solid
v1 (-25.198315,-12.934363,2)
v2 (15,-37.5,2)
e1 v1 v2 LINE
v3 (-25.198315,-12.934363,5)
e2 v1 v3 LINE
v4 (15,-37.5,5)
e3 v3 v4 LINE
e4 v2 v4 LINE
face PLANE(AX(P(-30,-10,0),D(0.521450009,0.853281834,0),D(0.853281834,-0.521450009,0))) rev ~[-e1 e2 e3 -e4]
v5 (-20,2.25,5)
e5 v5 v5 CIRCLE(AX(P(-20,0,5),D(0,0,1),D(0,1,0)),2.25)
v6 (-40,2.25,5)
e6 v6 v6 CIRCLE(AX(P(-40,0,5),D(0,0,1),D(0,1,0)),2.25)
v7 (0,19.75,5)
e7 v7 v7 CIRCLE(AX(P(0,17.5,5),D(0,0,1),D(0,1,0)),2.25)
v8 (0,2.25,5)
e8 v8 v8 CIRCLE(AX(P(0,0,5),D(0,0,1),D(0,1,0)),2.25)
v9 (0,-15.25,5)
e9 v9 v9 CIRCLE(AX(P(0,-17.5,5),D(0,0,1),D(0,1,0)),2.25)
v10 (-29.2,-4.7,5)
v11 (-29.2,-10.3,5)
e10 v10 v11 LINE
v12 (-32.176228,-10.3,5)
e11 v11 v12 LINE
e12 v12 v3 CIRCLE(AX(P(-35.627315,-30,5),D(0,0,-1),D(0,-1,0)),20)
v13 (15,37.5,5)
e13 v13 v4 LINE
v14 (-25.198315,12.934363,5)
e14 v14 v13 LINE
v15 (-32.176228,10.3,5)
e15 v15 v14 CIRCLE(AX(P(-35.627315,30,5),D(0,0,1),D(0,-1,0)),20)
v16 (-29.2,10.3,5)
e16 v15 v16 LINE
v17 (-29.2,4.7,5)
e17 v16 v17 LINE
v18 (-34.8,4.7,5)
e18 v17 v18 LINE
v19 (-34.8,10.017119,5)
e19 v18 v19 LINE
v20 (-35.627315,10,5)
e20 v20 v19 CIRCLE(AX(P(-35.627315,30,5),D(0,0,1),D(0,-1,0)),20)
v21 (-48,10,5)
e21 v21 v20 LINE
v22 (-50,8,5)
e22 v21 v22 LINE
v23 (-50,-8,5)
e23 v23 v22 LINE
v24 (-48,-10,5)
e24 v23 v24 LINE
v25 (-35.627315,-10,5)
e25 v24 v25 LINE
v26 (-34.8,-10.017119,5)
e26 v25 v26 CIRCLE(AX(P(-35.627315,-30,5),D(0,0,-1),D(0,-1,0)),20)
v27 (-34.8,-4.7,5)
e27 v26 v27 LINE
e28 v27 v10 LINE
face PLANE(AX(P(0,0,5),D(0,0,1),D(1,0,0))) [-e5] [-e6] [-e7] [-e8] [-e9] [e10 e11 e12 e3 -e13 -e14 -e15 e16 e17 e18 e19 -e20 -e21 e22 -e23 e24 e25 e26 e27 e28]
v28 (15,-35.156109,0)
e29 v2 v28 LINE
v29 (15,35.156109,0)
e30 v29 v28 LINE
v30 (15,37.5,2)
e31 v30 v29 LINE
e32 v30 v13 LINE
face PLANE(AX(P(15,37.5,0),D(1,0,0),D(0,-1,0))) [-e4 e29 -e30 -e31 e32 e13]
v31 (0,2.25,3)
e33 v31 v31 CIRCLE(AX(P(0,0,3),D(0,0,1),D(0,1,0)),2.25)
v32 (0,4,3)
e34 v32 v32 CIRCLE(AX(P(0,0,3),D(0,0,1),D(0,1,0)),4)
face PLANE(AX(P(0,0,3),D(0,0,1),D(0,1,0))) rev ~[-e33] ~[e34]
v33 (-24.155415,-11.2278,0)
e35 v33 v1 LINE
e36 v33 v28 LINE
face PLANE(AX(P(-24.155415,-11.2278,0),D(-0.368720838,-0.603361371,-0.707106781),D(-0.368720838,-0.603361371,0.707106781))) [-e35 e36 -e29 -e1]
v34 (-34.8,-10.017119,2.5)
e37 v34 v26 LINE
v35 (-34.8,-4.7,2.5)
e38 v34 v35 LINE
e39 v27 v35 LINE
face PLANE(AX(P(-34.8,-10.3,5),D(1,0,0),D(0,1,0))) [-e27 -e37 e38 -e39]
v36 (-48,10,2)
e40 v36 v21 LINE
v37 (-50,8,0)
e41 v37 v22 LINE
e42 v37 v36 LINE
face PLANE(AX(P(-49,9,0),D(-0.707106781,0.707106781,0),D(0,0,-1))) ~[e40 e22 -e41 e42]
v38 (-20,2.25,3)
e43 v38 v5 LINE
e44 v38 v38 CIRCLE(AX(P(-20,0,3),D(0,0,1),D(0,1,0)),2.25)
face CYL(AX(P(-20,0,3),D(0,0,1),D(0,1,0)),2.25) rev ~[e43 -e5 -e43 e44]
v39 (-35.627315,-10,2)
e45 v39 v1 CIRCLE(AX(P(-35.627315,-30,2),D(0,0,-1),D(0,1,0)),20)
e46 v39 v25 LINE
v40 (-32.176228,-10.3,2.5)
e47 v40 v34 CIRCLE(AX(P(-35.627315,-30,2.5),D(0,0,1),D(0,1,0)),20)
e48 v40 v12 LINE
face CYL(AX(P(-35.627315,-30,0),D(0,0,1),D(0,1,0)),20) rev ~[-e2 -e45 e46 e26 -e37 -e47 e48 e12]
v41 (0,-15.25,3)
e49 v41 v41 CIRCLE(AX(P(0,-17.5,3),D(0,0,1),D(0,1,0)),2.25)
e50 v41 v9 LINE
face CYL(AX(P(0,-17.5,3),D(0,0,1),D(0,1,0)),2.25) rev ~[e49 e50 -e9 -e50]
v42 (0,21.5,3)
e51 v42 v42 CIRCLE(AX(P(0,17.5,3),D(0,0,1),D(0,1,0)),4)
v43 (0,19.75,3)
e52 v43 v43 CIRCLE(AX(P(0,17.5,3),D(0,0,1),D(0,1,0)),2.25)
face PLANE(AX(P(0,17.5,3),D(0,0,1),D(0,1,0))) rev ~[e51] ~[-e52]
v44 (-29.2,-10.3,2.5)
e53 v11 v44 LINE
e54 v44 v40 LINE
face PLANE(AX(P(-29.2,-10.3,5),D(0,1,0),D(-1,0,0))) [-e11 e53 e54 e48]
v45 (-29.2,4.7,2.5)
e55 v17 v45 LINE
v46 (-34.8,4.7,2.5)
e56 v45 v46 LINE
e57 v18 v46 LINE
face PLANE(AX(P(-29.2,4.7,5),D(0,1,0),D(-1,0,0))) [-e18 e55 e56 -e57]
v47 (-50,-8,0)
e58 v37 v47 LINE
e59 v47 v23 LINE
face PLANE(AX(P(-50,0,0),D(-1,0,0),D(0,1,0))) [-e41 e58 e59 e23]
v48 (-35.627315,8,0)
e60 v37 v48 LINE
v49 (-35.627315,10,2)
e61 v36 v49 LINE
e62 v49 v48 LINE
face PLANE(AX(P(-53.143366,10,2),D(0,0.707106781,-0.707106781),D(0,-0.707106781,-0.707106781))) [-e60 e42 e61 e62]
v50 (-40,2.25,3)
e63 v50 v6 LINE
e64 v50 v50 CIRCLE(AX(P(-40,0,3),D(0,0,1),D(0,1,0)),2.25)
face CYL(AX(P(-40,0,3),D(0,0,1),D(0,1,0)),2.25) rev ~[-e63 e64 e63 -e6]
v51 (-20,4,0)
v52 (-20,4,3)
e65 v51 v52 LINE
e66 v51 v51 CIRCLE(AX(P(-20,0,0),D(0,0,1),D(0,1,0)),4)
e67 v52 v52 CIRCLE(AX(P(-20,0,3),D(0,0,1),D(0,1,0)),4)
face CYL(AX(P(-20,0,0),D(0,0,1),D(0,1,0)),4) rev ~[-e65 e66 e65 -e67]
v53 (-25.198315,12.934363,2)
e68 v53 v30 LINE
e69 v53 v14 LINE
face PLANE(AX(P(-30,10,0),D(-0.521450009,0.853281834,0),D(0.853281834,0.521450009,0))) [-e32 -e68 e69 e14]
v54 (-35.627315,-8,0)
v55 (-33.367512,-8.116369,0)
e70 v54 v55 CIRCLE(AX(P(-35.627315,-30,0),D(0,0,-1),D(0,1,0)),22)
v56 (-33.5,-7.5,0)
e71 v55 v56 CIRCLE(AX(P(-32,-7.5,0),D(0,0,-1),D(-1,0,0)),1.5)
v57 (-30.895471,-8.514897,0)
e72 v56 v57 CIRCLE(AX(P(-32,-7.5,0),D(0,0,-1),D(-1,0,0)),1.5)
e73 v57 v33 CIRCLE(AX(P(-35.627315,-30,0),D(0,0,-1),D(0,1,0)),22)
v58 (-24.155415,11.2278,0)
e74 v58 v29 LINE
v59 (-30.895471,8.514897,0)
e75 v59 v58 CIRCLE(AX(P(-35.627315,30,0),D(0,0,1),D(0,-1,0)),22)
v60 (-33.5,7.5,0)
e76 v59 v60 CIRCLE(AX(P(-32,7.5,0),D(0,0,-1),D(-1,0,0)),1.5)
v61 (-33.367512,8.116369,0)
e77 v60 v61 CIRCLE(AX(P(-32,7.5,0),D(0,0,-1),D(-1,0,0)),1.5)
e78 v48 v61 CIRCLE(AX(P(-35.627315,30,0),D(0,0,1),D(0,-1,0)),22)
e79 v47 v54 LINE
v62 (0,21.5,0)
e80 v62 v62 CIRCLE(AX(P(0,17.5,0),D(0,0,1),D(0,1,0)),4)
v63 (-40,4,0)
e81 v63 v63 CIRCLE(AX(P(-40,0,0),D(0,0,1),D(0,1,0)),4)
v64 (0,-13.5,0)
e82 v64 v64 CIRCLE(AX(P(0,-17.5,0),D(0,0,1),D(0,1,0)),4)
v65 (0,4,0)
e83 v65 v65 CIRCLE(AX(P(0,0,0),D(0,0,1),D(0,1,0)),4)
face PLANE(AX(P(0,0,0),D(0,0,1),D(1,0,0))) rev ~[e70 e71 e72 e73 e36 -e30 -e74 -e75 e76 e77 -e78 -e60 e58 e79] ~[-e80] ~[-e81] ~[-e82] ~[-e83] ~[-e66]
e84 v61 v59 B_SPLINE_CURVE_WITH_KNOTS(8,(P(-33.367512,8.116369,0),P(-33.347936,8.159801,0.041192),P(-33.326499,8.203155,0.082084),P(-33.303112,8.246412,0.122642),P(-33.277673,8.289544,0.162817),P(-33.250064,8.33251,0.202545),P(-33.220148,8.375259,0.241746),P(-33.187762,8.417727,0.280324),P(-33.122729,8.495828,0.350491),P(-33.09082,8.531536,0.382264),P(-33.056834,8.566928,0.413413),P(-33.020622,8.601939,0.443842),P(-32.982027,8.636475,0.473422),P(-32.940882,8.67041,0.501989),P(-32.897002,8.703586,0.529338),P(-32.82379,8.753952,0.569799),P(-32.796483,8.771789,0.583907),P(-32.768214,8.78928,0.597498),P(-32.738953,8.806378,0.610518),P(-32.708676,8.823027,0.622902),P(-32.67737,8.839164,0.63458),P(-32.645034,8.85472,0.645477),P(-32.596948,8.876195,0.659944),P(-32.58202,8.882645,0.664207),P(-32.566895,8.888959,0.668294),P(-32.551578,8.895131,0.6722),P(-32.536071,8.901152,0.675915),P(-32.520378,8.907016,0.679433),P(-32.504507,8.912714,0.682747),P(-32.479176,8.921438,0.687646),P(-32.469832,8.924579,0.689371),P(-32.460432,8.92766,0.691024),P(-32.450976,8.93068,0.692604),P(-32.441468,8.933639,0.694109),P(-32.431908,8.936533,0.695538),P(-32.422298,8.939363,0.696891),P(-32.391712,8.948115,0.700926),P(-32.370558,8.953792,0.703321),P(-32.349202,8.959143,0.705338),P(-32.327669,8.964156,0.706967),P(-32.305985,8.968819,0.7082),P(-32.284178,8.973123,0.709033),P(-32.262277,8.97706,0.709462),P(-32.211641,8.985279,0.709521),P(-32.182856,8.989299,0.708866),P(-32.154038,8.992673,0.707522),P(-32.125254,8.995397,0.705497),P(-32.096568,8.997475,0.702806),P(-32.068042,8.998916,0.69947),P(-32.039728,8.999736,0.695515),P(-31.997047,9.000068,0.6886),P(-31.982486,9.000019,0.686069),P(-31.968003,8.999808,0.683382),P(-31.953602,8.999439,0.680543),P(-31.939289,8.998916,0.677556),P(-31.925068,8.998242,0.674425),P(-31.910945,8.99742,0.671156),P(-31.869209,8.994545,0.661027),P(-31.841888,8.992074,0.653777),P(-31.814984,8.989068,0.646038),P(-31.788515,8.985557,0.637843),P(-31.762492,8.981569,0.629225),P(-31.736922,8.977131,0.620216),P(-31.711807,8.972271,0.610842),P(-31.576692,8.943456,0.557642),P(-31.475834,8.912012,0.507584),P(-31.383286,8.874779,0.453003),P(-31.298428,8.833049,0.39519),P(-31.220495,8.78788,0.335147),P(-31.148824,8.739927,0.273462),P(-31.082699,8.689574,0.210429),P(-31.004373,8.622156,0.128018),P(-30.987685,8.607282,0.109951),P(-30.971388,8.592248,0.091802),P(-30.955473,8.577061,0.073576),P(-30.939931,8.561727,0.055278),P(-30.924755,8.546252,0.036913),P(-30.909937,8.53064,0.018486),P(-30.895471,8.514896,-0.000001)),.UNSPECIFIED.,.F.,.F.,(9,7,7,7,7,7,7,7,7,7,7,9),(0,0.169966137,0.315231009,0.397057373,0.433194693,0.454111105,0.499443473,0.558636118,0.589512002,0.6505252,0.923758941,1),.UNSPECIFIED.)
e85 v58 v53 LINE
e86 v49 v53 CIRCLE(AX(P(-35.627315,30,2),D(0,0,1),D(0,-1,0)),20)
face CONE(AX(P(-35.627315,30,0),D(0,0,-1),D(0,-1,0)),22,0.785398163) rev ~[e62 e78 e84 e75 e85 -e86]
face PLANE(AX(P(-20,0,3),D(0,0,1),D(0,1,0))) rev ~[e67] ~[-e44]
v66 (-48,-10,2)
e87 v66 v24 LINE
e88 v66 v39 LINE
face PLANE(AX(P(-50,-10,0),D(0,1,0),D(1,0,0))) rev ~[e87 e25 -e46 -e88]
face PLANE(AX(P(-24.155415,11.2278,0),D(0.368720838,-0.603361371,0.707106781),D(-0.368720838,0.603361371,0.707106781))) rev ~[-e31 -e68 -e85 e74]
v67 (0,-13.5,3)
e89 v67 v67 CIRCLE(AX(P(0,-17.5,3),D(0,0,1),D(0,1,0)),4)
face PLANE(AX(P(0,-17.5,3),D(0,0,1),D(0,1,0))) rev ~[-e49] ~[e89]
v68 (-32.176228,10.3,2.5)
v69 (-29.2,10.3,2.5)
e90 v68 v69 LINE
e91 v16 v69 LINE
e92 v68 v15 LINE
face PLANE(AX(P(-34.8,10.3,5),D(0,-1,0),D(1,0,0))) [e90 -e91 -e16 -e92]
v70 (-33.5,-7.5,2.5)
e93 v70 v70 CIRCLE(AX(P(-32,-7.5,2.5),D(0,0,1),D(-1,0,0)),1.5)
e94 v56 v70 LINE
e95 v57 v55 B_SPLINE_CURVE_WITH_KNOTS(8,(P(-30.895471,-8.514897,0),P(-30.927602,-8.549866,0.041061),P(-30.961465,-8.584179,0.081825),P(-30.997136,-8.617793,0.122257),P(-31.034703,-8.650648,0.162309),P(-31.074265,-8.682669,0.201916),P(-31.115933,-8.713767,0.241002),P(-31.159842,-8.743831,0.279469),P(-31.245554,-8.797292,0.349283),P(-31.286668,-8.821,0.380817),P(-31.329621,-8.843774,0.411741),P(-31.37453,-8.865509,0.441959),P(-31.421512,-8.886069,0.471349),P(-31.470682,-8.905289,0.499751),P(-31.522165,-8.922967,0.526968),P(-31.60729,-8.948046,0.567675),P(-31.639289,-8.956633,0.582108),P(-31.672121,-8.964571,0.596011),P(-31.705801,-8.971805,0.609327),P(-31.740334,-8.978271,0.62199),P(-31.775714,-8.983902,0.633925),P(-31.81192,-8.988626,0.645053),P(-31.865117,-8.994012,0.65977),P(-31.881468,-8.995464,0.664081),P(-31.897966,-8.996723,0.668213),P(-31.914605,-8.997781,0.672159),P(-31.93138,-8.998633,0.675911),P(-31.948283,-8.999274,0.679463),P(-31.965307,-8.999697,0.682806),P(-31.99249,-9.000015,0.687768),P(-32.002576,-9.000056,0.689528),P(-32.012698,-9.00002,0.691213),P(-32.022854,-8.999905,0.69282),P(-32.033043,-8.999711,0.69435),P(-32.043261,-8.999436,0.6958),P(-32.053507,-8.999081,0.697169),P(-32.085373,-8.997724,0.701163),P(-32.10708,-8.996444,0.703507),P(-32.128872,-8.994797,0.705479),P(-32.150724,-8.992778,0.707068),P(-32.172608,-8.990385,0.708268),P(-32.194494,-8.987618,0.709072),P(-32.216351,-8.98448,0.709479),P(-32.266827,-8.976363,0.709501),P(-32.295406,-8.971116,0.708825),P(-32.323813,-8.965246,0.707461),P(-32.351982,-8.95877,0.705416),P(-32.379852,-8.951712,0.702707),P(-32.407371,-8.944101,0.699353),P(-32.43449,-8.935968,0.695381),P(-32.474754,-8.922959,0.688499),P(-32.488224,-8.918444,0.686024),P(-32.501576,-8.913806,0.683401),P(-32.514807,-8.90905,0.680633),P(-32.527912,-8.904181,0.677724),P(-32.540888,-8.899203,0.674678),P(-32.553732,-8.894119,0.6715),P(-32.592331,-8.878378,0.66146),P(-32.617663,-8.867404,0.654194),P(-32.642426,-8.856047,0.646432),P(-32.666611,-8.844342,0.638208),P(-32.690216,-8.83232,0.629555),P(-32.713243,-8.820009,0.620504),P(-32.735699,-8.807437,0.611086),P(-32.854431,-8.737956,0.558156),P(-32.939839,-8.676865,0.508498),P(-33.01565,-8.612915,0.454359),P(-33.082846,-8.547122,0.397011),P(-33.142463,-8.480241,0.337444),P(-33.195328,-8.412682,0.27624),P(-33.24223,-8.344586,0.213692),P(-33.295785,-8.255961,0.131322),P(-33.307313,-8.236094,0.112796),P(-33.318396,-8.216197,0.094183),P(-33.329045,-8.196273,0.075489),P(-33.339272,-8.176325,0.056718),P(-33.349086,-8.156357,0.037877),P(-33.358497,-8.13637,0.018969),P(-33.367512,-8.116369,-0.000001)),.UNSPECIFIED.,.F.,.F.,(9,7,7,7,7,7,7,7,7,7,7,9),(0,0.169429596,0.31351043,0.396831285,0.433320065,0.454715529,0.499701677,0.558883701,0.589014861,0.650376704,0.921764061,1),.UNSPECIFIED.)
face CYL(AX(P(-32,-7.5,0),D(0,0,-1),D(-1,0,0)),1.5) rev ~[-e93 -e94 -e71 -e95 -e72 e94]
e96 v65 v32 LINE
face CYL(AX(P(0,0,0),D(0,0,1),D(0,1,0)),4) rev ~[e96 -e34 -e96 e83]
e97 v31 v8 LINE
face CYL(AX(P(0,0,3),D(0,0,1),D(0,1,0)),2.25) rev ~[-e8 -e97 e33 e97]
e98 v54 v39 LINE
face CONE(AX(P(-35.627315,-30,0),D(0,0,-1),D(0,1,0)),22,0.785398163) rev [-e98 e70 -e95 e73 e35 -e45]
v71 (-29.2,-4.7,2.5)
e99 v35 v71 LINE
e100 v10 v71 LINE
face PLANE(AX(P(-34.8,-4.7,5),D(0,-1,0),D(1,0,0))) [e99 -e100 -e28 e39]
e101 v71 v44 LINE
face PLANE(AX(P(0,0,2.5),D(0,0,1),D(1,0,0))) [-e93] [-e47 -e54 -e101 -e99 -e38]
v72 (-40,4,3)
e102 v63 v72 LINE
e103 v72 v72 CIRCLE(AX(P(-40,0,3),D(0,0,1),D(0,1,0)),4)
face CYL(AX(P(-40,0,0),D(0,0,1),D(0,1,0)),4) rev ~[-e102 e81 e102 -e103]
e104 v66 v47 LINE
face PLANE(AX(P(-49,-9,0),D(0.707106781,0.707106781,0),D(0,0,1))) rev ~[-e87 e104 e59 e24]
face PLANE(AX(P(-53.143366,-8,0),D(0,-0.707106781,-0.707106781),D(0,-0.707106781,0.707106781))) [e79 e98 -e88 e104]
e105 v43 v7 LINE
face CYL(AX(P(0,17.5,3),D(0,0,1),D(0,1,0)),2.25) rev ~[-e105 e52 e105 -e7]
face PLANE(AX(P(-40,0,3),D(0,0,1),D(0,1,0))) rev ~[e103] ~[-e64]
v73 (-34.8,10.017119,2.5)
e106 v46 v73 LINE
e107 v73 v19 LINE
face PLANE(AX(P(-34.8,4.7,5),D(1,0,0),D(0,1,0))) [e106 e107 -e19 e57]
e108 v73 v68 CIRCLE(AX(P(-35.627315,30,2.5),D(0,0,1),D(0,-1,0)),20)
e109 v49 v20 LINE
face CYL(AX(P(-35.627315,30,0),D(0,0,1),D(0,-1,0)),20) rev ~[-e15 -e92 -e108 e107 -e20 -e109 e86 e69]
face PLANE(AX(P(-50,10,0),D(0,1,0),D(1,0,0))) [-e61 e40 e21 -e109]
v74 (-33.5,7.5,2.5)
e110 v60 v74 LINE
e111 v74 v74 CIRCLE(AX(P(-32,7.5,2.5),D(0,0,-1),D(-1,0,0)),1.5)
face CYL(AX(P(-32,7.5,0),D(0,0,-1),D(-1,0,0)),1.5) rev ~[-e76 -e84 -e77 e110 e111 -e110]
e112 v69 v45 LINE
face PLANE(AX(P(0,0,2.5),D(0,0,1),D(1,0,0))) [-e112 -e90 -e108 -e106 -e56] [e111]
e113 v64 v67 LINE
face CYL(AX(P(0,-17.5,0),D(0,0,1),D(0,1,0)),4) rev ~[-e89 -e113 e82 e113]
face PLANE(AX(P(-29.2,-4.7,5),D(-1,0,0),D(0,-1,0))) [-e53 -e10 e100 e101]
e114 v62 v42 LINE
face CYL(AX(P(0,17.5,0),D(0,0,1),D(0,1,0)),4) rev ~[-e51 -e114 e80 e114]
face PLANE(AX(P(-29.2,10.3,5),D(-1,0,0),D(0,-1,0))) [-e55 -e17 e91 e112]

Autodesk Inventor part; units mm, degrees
ref_plane "YZ Plane" through (0, 0, 0) normal (1, 0, 0) x (0, 1, 0)
ref_plane "XZ Plane" through (0, 0, 0) normal (0, 1, 0) x (-1, 0, 0)
ref_plane "XY Plane" through (0, 0, 0) normal (0, 0, 1) x (1, 0, 0)
sketch "Sketch1" plane through (0, 0, 0) normal (0, 0, 1) x (1, 0, 0)
  line L0 (0, 0) -> (-50, 0) construction
  line L1 (-50, 0) -> (-50, 10)
  line L2 (-50, 0) -> (-50, -10)
  line L3 (-50, -10) -> (-30, -10)
  line L4 (-30, -10) -> (15, -37.5)
  line L5 (-50, 10) -> (-30, 10)
  line L6 (-30, 10) -> (15, 37.5)
  line L7 (15, 37.5) -> (15, -37.5)
  line L8 (0, 0) -> (15, 0) construction
  line L9 (0, 17.5) -> (0, -17.5) construction
  point P0 (-40, 0)
  point P1 (-20, 0)
  dimension "d0" = 20
  dimension "d1" = 65
  dimension "d2" = 50
  dimension "d4" = 20
  dimension "d5" = 75
  dimension "d6" = 35
  dimension "d9" = 40
  dimension "d41" = 20
extrude "Extrusion1" add sketch "Sketch1" along normal blind 5
hole "Hole1" at (0, 17.5, 0) at (0, -17.5, 0) at (-40, 0, 0) at (0, 0, 0) at (-20, 0, 0) direction (0, 0, 1) diameter 4.5 end through all counterbore diameter 8 counterbore depth 3
fillet "Fillet1" radius 20 2 edges at (-30, 10, 2.5) (-30, -10, 2.5)
chamfer "Chamfer1" distance 2 angle 45 2 edges at (-50, 10, 2.5) (-50, -10, 2.5)
sketch "Sketch2" plane through (0, 0, 0) normal (0, 0, -1) x (-1, 0, 0)
  line L0 (50, -8) -> (48, -10) projected
  line L1 (50, 8) -> (50, -8) projected
  line L2 (48, 10) -> (50, 8) projected
  line L3 (35.6273, 10) -> (48, 10) projected
  arc A0 (25.1983, 12.9344) -> (35.6273, 10) centre (35.6273, 30) ccw projected
  line L4 (-15, 37.5) -> (25.1983, 12.9344) projected
  line L5 (-15, -37.5) -> (-15, 37.5) projected
  line L6 (25.1983, -12.9344) -> (-15, -37.5) projected
  arc A1 (35.6273, -10) -> (25.1983, -12.9344) centre (35.6273, -30) ccw projected
  line L7 (48, -10) -> (35.6273, -10) projected
  circle A2 centre (0, 0) radius 4 projected
  circle A3 centre (40, 0) radius 4 projected
  circle A4 centre (0, -17.5) radius 4 projected
  circle A5 centre (0, 17.5) radius 4 projected
  line L8 (32, 7.5) -> (32, -7.5) construction
  line L9 (50, 0) -> (32, 0) construction
  circle A6 centre (32, 7.5) radius 1.5
  circle A7 centre (32, -7.5) radius 1.5
  line L10 (29, 4) -> (32, 4)
  line L11 (32, 4) -> (32, -4)
  line L12 (32, -4) -> (29, -4)
  line L13 (29, -4) -> (29, 4)
  line L14 (50, 4) -> (47, 4)
  line L15 (47, 4) -> (47, -4)
  line L16 (47, -4) -> (50, -4)
  line L17 (50, -4) -> (50, 4)
  line L18 (50, 8) -> (50, -8) projected
  point P0 (32, 0)
  point P1 (47, 0)
  dimension "d24" = 18
  dimension "d25" = 15
  dimension "d26" = 3
  dimension "d27" = 3
  dimension "d30" = 3
  dimension "d31" = 3
  dimension "d32" = 8
  dimension "d33" = 8
  dimension "d34" = 3
extrude "Extrusion2" cut sketch "Sketch2" against normal through all contours A6 | A7
chamfer "Chamfer2" distance 2 angle 45 6 edges at (-41.8137, 10, 0) (-30.2103, 10.7476, 0) (-5.0992, 25.2172, 0) (-30.2103, -10.7476, 0) (-5.0992, -25.2172, 0) (-41.8137, -10, 0)
sketch "Sketch3" plane through (0, 0, 5) normal (0, 0, 1) x (1, 0, 0)
  circle A0 centre (-32, 7.5) radius 1.5 projected
  circle A1 centre (-32, -7.5) radius 1.5 projected
  line L0 (-29.2, 4.7) -> (-34.8, 4.7)
  line L1 (-34.8, 4.7) -> (-34.8, 10.3)
  line L2 (-34.8, 10.3) -> (-29.2, 10.3)
  line L3 (-29.2, 10.3) -> (-29.2, 4.7)
  line L4 (-29.2, 4.7) -> (-34.8, 10.3) construction
  line L5 (-34.8, 4.7) -> (-29.2, 10.3) construction
  line L6 (-29.2, -10.3) -> (-34.8, -10.3)
  line L7 (-34.8, -10.3) -> (-34.8, -4.7)
  line L8 (-34.8, -4.7) -> (-29.2, -4.7)
  line L9 (-29.2, -4.7) -> (-29.2, -10.3)
  line L10 (-29.2, -10.3) -> (-34.8, -4.7) construction
  line L11 (-34.8, -10.3) -> (-29.2, -4.7) construction
  point P0 (0, 0)
  dimension "d37" = 5.6
  dimension "d38" = 5.6
extrude "Extrusion4" cut sketch "Sketch3" against normal blind 2.5
equation "\"d27\" = d26"
properties part number "Y Axis Holder_3DPrint"
